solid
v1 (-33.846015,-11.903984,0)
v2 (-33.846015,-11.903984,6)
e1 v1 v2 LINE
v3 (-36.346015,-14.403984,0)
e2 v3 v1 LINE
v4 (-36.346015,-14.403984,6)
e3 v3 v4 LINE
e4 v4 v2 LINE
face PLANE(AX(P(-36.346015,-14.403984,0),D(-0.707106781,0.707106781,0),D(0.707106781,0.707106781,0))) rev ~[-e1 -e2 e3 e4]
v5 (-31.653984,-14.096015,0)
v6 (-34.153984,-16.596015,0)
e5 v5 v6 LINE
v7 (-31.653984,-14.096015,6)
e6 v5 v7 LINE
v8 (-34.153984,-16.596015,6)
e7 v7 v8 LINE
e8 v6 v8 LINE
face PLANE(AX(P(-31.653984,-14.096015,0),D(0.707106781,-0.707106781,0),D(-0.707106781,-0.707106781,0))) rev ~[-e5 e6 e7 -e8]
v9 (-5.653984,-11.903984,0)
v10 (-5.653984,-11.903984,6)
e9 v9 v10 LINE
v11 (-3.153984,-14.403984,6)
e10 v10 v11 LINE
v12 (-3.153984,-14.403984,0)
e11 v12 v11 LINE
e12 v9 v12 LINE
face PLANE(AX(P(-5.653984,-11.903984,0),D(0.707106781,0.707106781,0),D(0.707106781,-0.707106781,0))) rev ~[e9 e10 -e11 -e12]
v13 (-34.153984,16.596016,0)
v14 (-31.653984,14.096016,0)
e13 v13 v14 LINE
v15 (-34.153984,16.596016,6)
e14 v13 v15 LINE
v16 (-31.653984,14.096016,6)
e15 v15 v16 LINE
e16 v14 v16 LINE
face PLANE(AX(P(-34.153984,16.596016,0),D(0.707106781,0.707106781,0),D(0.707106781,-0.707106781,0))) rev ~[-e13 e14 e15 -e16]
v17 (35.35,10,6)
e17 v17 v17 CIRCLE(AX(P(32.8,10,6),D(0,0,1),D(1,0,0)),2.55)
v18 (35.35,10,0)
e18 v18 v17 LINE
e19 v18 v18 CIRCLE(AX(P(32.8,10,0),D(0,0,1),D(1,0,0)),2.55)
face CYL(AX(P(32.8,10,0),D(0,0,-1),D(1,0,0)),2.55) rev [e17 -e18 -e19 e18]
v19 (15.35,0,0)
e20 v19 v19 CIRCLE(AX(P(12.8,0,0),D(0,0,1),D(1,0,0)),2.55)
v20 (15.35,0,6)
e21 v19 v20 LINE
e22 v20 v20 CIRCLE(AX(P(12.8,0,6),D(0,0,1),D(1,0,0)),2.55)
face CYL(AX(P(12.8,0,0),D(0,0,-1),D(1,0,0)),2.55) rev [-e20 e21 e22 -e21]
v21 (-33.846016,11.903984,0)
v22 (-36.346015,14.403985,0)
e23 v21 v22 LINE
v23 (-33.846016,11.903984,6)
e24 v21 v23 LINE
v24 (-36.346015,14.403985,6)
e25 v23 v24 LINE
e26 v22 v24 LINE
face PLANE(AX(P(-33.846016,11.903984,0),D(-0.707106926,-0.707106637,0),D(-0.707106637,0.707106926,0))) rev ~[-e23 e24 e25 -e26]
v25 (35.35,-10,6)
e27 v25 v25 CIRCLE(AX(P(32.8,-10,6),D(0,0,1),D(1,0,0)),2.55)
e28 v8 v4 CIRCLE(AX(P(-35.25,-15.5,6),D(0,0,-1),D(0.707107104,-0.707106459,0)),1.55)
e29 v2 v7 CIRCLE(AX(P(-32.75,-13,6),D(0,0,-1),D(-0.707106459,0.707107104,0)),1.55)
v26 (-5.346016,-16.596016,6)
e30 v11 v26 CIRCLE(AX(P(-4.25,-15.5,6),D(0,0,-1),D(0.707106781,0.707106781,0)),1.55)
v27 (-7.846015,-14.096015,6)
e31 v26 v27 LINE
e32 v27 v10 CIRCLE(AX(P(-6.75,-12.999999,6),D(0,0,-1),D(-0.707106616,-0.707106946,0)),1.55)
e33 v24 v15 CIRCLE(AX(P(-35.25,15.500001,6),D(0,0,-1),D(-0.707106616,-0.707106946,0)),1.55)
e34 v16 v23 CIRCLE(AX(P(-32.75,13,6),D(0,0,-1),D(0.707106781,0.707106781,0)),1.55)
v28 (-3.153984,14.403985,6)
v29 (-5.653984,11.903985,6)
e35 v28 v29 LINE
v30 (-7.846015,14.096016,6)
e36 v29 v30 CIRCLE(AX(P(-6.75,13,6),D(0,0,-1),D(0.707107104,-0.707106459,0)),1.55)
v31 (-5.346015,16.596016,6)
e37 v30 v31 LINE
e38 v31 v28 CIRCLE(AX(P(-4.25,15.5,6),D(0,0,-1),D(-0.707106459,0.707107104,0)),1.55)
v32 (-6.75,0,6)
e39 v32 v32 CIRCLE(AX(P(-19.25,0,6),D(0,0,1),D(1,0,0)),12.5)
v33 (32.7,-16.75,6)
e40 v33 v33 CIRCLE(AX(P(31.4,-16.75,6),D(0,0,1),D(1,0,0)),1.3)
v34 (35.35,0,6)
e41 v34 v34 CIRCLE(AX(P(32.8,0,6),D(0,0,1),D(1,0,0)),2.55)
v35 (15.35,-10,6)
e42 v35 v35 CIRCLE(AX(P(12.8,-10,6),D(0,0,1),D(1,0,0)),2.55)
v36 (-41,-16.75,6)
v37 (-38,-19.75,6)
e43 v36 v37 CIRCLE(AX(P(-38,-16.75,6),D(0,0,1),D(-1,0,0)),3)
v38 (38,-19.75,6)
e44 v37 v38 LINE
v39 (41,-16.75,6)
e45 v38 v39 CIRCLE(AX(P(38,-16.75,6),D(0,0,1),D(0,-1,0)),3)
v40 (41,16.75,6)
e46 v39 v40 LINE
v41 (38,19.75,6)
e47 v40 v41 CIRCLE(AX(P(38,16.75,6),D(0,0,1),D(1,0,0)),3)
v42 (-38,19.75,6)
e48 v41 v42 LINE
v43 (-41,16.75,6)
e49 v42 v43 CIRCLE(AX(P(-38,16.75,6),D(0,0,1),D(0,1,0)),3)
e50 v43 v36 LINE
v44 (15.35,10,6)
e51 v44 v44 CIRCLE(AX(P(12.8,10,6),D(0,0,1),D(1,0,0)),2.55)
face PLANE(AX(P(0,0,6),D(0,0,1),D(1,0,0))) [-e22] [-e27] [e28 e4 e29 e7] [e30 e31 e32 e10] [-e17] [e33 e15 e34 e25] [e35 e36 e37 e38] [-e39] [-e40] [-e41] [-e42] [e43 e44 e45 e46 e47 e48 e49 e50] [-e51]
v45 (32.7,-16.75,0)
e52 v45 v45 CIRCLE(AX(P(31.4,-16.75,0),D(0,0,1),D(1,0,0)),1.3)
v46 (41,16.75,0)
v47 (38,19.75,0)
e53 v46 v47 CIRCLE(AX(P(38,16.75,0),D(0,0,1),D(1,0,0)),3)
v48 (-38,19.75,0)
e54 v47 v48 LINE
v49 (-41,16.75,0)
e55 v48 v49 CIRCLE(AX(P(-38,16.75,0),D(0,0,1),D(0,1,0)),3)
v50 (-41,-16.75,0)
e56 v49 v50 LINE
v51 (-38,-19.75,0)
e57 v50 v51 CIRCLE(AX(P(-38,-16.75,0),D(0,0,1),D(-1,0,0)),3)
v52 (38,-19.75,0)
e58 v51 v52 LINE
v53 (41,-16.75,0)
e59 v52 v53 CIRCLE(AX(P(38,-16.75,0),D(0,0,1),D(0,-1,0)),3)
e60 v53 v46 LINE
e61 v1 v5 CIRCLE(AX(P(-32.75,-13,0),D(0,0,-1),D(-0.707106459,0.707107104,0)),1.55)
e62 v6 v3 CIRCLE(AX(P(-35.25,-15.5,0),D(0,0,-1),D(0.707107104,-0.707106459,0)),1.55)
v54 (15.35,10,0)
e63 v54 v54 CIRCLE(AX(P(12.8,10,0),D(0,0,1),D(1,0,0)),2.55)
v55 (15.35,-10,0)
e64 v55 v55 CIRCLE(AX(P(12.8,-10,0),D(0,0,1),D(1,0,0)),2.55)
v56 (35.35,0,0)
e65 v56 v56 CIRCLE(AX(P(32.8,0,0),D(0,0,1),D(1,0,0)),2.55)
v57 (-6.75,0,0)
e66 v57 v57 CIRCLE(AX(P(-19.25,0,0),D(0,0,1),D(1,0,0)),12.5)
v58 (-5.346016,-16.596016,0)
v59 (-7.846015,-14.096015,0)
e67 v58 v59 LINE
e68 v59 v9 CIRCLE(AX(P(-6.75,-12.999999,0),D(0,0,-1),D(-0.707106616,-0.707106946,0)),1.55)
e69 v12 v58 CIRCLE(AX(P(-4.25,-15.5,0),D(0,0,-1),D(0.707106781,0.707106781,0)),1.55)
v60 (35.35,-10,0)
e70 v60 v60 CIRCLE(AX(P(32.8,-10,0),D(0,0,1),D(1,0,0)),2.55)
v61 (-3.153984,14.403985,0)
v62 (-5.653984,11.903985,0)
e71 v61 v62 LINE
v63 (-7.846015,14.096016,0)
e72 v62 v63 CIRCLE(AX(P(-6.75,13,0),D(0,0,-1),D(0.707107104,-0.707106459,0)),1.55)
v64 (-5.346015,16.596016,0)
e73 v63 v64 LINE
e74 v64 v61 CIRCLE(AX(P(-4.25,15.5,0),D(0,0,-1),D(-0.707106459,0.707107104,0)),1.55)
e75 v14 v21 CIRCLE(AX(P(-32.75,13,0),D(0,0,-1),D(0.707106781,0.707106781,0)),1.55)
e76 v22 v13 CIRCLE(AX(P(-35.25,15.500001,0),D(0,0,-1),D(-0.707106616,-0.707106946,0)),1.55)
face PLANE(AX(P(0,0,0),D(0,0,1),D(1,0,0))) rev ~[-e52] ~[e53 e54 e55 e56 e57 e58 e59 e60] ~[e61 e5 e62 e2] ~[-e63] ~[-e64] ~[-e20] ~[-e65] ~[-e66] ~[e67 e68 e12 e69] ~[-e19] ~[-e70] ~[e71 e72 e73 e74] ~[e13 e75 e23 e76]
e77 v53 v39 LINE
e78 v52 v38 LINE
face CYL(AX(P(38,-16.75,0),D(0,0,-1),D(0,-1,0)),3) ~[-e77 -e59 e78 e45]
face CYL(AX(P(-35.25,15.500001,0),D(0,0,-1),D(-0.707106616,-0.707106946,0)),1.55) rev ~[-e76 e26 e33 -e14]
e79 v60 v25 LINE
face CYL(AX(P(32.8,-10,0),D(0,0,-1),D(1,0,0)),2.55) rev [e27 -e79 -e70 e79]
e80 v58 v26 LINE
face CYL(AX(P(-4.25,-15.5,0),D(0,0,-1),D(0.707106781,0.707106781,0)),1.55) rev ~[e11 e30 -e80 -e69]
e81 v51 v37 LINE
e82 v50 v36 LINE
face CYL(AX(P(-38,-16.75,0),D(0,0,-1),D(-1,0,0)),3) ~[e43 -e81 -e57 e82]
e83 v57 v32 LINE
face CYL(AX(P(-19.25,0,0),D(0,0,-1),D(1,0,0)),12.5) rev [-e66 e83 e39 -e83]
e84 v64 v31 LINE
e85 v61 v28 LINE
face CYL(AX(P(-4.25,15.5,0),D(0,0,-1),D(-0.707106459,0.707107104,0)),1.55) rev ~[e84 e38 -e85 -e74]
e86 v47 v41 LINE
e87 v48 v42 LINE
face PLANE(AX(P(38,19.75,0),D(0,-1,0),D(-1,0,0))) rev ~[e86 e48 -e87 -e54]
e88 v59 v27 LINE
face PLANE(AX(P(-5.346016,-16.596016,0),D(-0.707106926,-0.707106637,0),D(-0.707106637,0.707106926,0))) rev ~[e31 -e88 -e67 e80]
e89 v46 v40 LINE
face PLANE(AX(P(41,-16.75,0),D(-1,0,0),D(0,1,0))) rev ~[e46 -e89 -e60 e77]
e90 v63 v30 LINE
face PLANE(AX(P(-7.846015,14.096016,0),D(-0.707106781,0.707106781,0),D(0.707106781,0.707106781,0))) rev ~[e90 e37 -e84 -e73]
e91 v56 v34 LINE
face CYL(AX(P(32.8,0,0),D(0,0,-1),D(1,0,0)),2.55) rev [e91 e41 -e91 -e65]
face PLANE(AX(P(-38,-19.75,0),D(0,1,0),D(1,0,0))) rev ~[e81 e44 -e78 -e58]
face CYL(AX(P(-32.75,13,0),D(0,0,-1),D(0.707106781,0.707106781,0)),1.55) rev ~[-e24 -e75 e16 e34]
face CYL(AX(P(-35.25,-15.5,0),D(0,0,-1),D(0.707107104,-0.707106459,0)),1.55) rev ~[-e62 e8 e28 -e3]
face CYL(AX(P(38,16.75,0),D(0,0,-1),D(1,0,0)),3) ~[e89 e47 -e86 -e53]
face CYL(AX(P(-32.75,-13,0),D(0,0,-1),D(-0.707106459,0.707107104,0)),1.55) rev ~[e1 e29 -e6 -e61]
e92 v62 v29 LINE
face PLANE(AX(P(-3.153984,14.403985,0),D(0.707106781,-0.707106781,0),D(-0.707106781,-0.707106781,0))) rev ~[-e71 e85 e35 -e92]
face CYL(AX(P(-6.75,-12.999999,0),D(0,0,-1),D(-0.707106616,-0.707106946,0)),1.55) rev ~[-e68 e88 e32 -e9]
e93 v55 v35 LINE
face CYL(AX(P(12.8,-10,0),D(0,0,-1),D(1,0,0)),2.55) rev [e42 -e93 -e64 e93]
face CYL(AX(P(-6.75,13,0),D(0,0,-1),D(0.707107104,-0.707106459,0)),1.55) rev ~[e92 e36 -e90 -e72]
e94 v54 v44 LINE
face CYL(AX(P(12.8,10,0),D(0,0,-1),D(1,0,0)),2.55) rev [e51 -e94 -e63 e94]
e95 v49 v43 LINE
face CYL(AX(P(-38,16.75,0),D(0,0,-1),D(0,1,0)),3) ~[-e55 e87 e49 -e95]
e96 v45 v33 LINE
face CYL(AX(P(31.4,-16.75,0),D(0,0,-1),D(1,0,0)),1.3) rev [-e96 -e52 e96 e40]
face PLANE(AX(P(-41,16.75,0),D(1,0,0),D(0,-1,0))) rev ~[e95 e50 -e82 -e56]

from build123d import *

# Parameters (mm, degrees)
F0_R     = 12.5
F0_R_2   = 2.55
F0_R_3   = 1.3
F1_DEPTH = 6


# Not quite as in the source:
# - ends of sketch curves that miss each other by under 0.0002 mm in the source are joined


with BuildPart() as f1:
    # F0 (on Top) → F1 (new body)
    with BuildSketch(Plane.XY):
        with BuildLine():
            Line((38, 19.75), (-38, 19.75))
            ThreePointArc((-38, 19.75), (-40.1213203436, 18.8713203436), (-41, 16.75))
            Line((-41, 16.75), (-41, -16.75))
            ThreePointArc((-41, -16.75), (-40.1213203436, -18.8713203436), (-38, -19.75))
            Line((-38, -19.75), (38, -19.75))
            ThreePointArc((38, -19.75), (40.1213203436, -18.8713203436), (41, -16.75))
            Line((41, -16.75), (41, 16.75))
            ThreePointArc((41, 16.75), (40.1213203436, 18.8713203436), (38, 19.75))
        make_face()
        with BuildLine():
            ThreePointArc((-34.1539839892, -16.5960150108), (-36.3460155108, -16.5960155108), (-36.3460150108, -14.4039839892))
            Line((-36.346015, -14.403984), (-33.846015, -11.903984))
            ThreePointArc((-33.8460150108, -11.9039839892), (-31.6539844892, -11.9039844892), (-31.6539839892, -14.0960150108))
            Line((-31.653984, -14.096015), (-34.153984, -16.596015))
        make_face(mode=Mode.SUBTRACT)
        with BuildLine():
            ThreePointArc((-3.1539844892, -14.4039844892), (-3.1539844892, -16.5960155108), (-5.3460155108, -16.5960155108))
            Line((-5.3460155108, -16.5960155108), (-7.846015, -14.096015))
            ThreePointArc((-7.846015, -14.096015), (-7.8460155108, -11.9039844892), (-5.6539844892, -11.9039844892))
            Line((-5.6539844892, -11.9039844892), (-3.1539844892, -14.4039844892))
        make_face(mode=Mode.SUBTRACT)
        with Locations((-19.25, 0)):
            Circle(F0_R, mode=Mode.SUBTRACT)
        with Locations((12.8, -10)):
            Circle(F0_R_2, mode=Mode.SUBTRACT)
        with Locations((31.4, -16.75)):
            Circle(F0_R_3, mode=Mode.SUBTRACT)
        with Locations((32.8, -10)):
            Circle(F0_R_2, mode=Mode.SUBTRACT)
        with Locations((12.8, 0)):
            Circle(F0_R_2, mode=Mode.SUBTRACT)
        with Locations((32.8, 0)):
            Circle(F0_R_2, mode=Mode.SUBTRACT)
        with BuildLine():
            ThreePointArc((-31.6539844892, 14.0960155108), (-31.6539844892, 11.9039844892), (-33.8460155108, 11.9039844892))
            Line((-33.8460155108, 11.9039844892), (-36.346015, 14.403985))
            ThreePointArc((-36.346015, 14.403985), (-36.3460155108, 16.5960155108), (-34.1539844892, 16.5960155108))
            Line((-34.1539844892, 16.5960155108), (-31.6539844892, 14.0960155108))
        make_face(mode=Mode.SUBTRACT)
        with BuildLine():
            ThreePointArc((-5.3460150108, 16.5960160108), (-3.1539844892, 16.5960155108), (-3.1539839892, 14.4039849892))
            Line((-3.153984, 14.403985), (-5.653984, 11.903985))
            ThreePointArc((-5.6539839892, 11.9039849892), (-7.8460155108, 11.9039844892), (-7.8460150108, 14.0960160108))
            Line((-7.846015, 14.096016), (-5.346015, 16.596016))
        make_face(mode=Mode.SUBTRACT)
        with Locations((12.8, 10)):
            Circle(F0_R_2, mode=Mode.SUBTRACT)
        with Locations((32.8, 10)):
            Circle(F0_R_2, mode=Mode.SUBTRACT)
    extrude(amount=F1_DEPTH)


solid = f1.part
